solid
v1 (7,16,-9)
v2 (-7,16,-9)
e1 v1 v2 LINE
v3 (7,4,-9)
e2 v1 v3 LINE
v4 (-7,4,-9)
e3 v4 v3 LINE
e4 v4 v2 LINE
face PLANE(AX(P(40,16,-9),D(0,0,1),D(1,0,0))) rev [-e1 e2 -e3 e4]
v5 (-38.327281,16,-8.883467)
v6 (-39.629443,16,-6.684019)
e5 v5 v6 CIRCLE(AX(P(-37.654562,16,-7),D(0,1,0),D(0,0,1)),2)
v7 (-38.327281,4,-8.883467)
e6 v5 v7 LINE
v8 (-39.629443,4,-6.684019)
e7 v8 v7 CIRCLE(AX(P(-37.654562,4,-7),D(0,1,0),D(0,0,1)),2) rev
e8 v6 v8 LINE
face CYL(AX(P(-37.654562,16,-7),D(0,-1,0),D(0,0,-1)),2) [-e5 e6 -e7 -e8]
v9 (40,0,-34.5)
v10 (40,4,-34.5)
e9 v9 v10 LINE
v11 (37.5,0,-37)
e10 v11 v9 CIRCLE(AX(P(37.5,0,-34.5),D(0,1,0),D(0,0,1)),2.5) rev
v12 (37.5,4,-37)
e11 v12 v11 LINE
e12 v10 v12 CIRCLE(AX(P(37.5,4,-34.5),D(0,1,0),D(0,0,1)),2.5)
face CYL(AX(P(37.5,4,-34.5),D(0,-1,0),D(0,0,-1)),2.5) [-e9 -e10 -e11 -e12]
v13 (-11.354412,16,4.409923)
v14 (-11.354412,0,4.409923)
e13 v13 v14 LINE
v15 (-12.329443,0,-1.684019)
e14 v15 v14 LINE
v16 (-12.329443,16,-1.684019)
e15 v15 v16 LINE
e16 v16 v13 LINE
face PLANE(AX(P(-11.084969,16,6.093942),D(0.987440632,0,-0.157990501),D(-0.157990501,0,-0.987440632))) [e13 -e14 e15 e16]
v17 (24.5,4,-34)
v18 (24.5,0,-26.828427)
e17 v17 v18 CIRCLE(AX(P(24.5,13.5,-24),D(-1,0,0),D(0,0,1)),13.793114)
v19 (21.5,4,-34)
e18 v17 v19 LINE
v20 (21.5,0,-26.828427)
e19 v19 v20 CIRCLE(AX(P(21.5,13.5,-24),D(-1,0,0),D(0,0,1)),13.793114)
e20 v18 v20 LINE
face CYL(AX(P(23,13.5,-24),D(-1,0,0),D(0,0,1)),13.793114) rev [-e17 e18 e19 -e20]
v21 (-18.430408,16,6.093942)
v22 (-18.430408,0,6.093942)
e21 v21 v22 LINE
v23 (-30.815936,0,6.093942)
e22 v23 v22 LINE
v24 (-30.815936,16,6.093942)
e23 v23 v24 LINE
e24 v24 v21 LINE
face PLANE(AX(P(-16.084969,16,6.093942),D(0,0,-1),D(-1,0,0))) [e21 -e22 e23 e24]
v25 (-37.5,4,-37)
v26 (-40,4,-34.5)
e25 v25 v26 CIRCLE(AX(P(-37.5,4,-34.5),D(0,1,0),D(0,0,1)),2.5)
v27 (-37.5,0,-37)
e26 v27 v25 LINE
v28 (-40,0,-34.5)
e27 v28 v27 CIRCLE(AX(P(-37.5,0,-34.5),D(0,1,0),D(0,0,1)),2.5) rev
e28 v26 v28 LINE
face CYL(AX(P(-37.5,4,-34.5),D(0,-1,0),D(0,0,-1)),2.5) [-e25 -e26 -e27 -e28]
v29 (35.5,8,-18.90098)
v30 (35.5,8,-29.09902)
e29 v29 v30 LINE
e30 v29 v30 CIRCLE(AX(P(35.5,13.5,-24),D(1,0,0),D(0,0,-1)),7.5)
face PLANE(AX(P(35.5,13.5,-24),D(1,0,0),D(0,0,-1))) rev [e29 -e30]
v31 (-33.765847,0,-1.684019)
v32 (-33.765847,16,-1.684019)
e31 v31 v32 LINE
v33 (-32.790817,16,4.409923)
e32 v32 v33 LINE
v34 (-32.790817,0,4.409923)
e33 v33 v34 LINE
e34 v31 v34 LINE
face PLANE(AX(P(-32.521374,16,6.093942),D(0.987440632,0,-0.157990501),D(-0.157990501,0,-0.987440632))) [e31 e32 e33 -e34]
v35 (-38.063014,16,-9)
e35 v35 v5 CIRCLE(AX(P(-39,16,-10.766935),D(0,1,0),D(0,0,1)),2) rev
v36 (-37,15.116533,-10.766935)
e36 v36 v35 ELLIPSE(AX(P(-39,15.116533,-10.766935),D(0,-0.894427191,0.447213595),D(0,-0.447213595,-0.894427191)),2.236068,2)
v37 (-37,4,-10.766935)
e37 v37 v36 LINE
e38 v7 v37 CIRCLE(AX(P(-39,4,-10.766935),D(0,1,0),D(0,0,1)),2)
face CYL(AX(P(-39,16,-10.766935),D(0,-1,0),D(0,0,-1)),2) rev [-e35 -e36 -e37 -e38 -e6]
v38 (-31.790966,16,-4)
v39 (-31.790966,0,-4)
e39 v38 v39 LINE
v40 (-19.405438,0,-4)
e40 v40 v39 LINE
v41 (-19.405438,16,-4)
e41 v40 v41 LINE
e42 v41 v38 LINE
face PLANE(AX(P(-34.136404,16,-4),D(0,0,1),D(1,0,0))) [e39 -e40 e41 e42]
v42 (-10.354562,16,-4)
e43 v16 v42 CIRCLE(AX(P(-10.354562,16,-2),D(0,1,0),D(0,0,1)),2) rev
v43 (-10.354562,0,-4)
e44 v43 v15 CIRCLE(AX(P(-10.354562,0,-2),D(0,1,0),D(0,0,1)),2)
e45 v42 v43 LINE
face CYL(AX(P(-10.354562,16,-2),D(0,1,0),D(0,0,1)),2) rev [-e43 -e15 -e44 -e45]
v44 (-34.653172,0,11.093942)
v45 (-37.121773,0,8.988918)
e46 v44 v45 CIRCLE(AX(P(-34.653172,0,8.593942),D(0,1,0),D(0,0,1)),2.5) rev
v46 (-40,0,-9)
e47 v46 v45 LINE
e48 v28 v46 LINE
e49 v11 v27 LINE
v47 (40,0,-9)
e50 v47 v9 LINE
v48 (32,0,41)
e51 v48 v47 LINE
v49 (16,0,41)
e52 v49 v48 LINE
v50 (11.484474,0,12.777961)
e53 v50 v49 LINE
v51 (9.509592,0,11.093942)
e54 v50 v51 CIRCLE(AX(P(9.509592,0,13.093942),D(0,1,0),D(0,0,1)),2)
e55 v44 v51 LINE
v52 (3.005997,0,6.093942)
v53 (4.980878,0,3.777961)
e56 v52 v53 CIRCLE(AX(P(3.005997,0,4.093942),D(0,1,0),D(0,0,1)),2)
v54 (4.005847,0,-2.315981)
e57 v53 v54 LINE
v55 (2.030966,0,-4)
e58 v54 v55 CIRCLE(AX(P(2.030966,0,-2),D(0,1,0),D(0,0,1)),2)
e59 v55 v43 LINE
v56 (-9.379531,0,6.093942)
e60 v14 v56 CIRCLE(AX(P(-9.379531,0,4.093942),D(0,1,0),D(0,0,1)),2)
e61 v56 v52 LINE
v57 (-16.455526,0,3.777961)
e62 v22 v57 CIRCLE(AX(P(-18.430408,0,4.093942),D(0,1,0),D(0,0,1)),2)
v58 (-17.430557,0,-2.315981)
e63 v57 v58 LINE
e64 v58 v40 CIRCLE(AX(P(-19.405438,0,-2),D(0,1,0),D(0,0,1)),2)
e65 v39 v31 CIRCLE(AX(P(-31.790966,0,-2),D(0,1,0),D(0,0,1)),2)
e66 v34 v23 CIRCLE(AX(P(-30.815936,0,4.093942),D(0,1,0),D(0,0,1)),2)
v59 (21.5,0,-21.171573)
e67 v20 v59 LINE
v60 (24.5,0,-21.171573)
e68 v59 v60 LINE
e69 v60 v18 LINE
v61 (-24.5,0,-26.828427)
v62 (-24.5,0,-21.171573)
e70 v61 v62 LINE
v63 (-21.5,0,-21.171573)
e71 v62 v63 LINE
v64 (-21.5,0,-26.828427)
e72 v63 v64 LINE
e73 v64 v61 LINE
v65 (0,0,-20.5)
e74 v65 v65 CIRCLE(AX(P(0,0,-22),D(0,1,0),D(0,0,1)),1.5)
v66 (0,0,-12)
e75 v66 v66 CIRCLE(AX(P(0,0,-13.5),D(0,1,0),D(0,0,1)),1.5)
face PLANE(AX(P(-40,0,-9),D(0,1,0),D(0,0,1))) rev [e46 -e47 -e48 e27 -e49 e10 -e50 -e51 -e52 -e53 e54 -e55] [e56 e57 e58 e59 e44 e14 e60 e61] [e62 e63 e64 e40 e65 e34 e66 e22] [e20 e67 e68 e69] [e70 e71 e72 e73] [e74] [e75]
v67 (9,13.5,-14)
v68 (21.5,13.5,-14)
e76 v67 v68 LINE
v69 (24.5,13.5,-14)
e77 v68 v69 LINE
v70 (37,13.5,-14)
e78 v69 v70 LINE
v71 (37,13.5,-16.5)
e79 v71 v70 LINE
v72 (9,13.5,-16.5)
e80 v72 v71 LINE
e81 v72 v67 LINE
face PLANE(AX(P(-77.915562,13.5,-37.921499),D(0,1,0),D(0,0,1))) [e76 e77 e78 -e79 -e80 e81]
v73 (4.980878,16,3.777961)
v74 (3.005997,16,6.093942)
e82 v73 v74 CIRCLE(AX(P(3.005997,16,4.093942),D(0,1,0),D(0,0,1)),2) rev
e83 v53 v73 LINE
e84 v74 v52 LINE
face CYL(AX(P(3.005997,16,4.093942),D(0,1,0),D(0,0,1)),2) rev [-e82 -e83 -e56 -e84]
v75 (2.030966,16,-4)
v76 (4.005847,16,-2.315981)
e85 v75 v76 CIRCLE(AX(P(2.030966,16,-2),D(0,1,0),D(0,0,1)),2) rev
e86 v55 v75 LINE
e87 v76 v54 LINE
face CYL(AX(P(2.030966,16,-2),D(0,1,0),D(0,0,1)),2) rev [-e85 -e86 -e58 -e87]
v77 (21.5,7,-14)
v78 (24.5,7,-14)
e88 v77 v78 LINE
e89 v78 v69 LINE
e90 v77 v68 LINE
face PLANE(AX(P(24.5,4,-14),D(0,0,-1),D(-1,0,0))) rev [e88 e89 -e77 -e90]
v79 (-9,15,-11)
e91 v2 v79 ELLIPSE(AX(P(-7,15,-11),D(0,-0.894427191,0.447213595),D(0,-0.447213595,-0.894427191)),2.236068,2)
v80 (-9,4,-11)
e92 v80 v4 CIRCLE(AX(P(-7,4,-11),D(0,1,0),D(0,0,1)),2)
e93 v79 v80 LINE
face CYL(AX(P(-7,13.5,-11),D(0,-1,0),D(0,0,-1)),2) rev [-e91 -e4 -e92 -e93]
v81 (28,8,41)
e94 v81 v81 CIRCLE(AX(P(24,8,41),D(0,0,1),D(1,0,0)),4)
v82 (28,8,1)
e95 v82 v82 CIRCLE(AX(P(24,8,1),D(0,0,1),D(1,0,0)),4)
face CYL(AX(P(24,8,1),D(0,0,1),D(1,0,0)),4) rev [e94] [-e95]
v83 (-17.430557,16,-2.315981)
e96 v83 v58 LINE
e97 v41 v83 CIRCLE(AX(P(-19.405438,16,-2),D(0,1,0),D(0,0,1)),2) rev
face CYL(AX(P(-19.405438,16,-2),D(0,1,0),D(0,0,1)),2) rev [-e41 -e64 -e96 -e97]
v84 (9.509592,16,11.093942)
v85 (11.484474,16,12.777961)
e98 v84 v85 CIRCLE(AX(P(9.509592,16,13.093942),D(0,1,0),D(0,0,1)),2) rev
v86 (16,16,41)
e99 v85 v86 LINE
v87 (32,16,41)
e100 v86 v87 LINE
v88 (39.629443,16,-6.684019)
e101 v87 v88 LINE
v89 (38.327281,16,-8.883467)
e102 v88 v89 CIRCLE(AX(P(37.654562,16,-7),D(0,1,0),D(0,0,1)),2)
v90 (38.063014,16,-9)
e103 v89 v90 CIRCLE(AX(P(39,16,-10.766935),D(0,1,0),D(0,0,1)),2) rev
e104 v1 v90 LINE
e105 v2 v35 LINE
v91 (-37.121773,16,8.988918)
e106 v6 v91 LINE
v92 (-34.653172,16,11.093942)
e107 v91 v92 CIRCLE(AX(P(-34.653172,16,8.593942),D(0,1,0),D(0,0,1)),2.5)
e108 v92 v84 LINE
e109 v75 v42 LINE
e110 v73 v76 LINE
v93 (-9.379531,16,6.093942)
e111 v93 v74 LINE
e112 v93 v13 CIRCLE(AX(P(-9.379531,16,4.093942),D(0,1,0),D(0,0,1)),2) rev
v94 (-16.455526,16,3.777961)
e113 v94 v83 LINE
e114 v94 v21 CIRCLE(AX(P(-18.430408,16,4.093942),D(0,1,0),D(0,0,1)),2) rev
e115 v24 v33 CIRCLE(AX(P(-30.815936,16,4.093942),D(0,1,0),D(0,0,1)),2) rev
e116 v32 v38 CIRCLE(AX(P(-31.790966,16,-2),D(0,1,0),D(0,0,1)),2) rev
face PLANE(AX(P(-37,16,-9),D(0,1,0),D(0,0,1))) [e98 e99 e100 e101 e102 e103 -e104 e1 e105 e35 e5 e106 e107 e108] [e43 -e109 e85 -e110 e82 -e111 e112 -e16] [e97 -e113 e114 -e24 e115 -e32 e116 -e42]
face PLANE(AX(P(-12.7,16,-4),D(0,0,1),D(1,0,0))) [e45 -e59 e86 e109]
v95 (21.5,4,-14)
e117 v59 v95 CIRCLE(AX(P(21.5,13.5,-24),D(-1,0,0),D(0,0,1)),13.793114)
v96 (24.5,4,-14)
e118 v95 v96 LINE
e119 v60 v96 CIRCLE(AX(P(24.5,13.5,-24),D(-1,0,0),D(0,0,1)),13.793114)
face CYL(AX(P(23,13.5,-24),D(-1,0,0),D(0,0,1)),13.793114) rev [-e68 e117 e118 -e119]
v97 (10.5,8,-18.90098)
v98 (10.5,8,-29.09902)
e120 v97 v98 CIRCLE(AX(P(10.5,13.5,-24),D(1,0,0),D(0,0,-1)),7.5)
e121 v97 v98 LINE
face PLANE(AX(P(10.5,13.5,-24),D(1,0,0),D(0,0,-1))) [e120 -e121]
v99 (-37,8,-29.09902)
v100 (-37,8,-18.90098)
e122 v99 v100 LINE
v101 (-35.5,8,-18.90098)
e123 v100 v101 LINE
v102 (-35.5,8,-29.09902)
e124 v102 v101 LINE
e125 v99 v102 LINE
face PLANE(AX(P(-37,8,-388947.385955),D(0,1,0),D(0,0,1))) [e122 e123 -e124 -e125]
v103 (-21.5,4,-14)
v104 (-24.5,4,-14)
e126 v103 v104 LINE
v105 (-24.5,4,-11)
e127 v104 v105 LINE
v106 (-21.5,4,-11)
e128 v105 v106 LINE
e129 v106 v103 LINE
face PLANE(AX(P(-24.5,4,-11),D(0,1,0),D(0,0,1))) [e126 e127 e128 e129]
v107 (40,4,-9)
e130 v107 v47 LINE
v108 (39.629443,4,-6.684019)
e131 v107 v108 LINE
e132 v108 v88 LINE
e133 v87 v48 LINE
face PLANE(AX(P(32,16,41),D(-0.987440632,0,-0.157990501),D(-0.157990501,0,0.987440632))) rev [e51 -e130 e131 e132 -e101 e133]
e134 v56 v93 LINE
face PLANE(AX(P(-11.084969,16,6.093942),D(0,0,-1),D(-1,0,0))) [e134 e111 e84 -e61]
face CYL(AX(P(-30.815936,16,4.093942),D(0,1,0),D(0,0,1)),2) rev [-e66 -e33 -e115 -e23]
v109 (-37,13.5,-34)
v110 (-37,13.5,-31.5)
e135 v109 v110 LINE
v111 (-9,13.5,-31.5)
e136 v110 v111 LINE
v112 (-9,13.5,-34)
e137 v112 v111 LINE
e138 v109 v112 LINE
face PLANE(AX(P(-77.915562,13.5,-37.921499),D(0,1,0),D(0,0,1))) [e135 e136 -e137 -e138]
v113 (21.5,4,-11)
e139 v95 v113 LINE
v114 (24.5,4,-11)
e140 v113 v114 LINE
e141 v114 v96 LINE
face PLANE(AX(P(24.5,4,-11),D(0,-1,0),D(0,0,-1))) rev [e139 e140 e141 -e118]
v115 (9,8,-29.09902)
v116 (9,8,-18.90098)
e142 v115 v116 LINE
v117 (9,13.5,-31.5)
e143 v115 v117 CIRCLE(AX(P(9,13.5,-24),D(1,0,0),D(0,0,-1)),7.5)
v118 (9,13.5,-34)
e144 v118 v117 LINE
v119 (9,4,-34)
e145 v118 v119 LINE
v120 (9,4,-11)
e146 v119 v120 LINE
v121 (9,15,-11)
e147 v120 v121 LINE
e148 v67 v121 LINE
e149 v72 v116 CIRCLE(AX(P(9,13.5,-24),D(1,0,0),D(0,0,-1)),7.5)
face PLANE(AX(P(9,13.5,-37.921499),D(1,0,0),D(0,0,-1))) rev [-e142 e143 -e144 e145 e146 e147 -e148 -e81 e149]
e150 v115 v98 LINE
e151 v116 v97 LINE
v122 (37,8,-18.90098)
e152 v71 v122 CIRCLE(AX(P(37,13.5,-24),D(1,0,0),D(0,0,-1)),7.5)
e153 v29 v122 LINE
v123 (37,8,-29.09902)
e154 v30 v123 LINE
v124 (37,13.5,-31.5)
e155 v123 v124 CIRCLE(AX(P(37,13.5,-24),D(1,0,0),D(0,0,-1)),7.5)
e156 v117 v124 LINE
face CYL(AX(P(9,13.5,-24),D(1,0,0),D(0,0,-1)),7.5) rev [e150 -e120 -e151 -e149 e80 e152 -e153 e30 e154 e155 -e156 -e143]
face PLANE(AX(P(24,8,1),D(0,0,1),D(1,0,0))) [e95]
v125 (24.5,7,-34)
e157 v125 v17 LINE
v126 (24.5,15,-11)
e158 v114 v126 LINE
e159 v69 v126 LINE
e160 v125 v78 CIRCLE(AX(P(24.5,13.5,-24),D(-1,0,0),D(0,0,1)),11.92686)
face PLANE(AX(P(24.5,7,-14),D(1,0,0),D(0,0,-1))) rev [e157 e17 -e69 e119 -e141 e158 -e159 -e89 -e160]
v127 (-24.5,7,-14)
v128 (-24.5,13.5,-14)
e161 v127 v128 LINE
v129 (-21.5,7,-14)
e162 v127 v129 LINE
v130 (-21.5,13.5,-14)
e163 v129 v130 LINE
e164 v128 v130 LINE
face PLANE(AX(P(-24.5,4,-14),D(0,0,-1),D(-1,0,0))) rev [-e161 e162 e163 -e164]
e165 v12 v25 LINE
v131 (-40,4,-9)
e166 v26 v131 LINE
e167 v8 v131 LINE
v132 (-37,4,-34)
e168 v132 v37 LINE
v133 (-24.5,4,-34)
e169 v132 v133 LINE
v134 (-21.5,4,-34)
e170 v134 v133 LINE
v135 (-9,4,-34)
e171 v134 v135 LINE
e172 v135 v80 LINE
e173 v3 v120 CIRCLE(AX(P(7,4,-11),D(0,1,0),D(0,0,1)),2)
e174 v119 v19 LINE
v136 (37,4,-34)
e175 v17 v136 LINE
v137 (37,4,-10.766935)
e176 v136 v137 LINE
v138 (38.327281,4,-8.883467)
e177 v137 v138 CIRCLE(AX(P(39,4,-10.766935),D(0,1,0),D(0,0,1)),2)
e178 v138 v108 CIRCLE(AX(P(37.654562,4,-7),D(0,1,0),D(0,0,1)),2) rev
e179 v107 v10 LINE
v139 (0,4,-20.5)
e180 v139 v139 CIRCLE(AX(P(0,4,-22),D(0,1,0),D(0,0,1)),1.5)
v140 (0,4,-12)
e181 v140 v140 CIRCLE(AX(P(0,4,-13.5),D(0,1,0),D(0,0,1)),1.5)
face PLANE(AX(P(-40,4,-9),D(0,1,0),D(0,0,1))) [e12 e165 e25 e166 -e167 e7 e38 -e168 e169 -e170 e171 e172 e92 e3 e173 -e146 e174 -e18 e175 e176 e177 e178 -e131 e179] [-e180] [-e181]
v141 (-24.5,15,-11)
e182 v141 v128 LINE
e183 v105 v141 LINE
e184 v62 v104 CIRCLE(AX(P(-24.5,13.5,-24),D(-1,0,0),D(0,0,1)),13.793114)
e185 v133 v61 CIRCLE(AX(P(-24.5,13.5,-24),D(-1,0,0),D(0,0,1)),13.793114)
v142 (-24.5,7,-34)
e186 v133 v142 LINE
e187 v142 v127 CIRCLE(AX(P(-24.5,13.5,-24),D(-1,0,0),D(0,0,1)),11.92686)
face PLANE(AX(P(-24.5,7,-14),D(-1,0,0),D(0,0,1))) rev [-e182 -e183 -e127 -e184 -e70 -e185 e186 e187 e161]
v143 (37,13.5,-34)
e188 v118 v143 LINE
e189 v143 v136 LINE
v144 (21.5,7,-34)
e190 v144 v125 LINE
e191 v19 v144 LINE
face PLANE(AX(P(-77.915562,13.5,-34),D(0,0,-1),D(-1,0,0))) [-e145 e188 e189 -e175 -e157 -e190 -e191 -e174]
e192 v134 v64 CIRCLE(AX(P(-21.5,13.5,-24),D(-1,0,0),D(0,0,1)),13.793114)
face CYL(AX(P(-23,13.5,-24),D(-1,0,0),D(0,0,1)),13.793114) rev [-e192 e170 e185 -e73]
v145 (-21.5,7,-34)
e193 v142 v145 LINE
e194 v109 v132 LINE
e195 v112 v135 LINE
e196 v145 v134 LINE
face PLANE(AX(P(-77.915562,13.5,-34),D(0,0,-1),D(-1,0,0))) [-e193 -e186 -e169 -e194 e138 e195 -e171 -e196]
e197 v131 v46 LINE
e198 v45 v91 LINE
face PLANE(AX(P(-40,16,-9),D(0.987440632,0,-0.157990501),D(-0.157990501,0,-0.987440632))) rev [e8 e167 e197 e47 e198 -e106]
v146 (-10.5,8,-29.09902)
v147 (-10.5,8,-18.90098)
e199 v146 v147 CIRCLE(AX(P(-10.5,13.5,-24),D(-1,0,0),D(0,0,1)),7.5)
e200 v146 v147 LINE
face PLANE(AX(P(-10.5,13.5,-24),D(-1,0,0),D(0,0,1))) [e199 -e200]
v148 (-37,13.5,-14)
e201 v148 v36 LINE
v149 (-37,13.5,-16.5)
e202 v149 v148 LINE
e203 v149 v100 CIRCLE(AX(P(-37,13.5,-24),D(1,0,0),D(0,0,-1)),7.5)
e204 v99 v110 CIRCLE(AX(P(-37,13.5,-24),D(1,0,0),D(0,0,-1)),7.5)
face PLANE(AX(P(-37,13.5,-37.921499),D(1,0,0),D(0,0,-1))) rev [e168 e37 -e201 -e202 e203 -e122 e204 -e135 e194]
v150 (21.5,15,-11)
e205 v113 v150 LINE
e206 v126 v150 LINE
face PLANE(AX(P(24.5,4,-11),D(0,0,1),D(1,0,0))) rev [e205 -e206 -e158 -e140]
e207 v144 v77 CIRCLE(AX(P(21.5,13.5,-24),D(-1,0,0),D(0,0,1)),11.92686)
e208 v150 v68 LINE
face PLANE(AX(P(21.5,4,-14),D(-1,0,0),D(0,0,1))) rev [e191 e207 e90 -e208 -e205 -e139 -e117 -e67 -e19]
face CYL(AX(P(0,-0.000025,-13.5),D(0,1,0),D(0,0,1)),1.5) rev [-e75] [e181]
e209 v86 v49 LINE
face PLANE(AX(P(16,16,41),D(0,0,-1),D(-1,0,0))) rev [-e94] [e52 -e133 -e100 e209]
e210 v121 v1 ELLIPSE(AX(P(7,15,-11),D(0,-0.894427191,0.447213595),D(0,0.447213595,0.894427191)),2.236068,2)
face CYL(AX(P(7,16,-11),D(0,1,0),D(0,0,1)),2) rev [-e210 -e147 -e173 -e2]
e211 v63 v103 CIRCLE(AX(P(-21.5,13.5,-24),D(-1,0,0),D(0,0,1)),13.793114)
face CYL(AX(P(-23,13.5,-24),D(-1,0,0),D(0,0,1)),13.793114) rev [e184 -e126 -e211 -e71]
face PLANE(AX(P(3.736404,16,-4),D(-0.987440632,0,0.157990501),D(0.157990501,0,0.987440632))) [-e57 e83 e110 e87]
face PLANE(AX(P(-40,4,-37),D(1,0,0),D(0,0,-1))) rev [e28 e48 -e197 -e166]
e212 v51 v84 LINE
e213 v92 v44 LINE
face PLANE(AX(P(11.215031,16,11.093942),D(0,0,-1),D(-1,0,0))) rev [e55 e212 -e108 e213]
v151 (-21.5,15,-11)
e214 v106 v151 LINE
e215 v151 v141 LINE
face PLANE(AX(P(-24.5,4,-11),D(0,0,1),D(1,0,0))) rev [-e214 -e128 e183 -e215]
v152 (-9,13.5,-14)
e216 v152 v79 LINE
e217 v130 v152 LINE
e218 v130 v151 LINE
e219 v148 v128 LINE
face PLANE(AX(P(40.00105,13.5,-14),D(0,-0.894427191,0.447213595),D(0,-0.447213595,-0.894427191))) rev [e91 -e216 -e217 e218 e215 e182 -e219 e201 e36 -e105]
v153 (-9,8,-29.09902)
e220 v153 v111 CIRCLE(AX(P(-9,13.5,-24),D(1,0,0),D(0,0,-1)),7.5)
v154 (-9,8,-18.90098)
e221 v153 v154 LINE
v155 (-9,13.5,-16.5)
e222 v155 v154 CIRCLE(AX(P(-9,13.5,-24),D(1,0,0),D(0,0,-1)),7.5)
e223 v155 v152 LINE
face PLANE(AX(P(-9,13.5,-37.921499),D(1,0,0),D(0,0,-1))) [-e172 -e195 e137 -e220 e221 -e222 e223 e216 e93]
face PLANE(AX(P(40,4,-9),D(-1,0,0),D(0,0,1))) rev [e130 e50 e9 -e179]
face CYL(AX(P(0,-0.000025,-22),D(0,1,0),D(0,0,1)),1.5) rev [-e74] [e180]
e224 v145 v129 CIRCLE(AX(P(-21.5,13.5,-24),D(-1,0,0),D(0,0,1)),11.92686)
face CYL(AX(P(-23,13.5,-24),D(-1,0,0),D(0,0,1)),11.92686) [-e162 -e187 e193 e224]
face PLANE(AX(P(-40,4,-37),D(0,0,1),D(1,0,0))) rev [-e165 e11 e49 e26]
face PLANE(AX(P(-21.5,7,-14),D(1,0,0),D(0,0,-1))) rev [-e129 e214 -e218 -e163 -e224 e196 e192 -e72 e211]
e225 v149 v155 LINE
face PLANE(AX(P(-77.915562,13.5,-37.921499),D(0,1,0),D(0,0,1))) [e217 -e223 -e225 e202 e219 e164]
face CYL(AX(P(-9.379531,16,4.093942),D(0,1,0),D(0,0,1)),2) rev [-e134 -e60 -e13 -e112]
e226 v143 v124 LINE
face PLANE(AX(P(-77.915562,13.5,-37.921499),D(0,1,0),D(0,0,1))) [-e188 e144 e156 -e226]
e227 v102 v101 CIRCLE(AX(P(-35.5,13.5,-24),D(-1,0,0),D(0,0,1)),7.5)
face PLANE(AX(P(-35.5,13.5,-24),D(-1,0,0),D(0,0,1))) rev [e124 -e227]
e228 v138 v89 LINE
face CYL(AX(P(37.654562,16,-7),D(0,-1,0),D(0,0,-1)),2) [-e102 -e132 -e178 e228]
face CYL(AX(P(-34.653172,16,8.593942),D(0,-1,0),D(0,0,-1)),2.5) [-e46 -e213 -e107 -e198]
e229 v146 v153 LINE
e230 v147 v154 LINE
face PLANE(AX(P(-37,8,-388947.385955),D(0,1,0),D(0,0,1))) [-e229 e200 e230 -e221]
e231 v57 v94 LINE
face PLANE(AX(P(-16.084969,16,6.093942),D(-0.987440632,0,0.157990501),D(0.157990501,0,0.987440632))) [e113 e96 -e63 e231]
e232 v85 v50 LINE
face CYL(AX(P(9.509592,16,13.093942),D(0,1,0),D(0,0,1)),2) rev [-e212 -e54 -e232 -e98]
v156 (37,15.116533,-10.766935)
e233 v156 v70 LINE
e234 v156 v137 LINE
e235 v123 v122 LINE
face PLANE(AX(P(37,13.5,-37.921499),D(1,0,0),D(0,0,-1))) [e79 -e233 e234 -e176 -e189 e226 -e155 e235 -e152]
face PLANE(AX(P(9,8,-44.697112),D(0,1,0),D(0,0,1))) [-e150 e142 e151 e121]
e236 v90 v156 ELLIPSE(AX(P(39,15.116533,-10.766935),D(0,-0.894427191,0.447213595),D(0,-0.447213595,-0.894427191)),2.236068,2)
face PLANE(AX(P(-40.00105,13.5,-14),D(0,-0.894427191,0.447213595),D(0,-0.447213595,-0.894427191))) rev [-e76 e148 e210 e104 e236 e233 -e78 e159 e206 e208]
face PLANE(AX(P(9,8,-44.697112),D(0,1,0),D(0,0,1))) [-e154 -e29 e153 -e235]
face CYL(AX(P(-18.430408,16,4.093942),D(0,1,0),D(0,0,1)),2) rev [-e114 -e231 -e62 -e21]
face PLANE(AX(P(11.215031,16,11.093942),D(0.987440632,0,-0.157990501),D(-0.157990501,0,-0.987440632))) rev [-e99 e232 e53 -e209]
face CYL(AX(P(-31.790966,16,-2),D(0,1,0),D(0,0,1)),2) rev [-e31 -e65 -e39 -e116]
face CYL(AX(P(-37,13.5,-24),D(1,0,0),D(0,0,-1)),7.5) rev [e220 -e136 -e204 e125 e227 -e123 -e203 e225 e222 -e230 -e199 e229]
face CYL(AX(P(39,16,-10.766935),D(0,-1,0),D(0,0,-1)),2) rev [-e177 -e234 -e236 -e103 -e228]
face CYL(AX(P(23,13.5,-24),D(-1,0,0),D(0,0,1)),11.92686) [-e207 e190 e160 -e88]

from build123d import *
from build123d.topology import SkipClean

# Parameters (mm, degrees)
SKETCH7_W           = 80
SKETCH7_H           = 28
EXTRUDE2_DEPTH      = 4
SKETCH8_W           = 28
SKETCH8_H           = 20
EXTRUDE3_DEPTH      = 9.5
EXTRUDE6_DEPTH      = 28
SKETCH15_R          = 7.5
EXTRUDE7_DEPTH      = 25
SKETCH16_W          = 3
SKETCH16_H          = 3
SKETCH8_4_W         = 28
SKETCH8_4_H         = 20
EXTRUDE8_DEPTH      = 9.5
EXTRUDE9_DEPTH      = 28
SKETCH19_R          = 7.5
EXTRUDE10_DEPTH     = 25
SKETCH20_W          = 3
SKETCH20_H          = 3
FILLET1_R           = 2.5
EXTRUDE11_DEPTH     = 16
SKETCH23_R          = 4
EXTRUDE12_DEPTH     = 40
SKETCH25_W          = 28
SKETCH25_H          = 5
EXTRUDE13_DEPTH     = 12
EXTRUDE14_REACH     = 90.69
FILLET2_R           = 2.5
FILLET9_R           = 2
FILLET10_R          = 2
FILLET11_R          = 2
SKETCH27_W          = 28
SKETCH27_H          = 5
EXTRUDE15_DEPTH     = 12
EXTRUDE16_REACH     = 90.69
FILLET12_R          = 2
FILLET13_R          = 2
FILLET14_R          = 2
FILLET15_R          = 2
SKETCH30_W          = 3
SKETCH30_H          = 3
EXTRUDE17_DEPTH     = 12
SKETCH31_W          = 3
SKETCH31_H          = 3
EXTRUDE18_DEPTH     = 12
FILLET16_R          = 2
EXTRUDE19_OUTLINE_R = 1.5
EXTRUDE19_DEPTH     = 4


# Read off the part's stored shape, not the designer's step: Extrude19
with BuildPart() as part:
    # Sketch7 → Extrude2 (new body)
    with BuildSketch(Plane(origin=(0, 0, 0), x_dir=(1, 0, 0), z_dir=(0, 1, 0))):
        with Locations((0, 23)):
            Rectangle(SKETCH7_W, SKETCH7_H)
    extrude(amount=EXTRUDE2_DEPTH)


with BuildPart() as body_2:
    # Sketch8 → Extrude3 (new body)
    with BuildSketch(Plane(origin=(0, 4, 0), x_dir=(1, 0, 0), z_dir=(0, 1, 0))):
        with Locations((-23, 24)):
            Rectangle(SKETCH8_W, SKETCH8_H)
    extrude(amount=EXTRUDE3_DEPTH)

    # Sketch10 → Extrude6 (cut)
    with BuildSketch(Plane(origin=(-9, 0, 0), x_dir=(0, 0, -1), z_dir=(1, 0, 0))):
        with BuildLine():
            Line((31.5, 13.5), (24, 13.5))
            Line((24, 13.5), (16.5, 13.5))
            ThreePointArc((16.5, 13.5), (17.126403912, 10.499387259), (18.900980486, 8))
            Line((18.900980486, 8), (29.099019514, 8))
            ThreePointArc((29.099019514, 8), (30.873596088, 10.499387259), (31.5, 13.5))
        make_face()
    extrude(amount=-EXTRUDE6_DEPTH, mode=Mode.SUBTRACT)

    # Sketch15 → Extrude7 (cut)
    with SkipClean():  # the faces are left unmerged after this step: merging them gives an invalid solid
        with BuildSketch(Plane.ZY.offset(35.5)):
            with Locations((-24, 13.5)):
                Circle(SKETCH15_R)
        extrude(amount=-EXTRUDE7_DEPTH, mode=Mode.SUBTRACT)


with BuildPart() as cut_sweep1_tool:
    # Cut-Sweep1: sweep along a path in Sketch17
    with SkipClean():  # the faces are left unmerged after this step: merging them gives an invalid solid
        with BuildLine(Plane(origin=(-23, 0, 0), x_dir=(0, 0, -1), z_dir=(1, 0, 0))) as cut_sweep1_path:
            CenterArc((24, 13.5), 12.806248475, 0, 360)
        # Sketch16 → Cut-Sweep1 (sweep)
        with BuildSketch(Plane.XY.offset(-14)):
            with Locations((-23, 5.5)):
                Rectangle(SKETCH16_W, SKETCH16_H)
        sweep(path=cut_sweep1_path.line)


with BuildPart() as part_1:
    with SkipClean():  # the faces are left unmerged after this step: merging them gives an invalid solid
        add(part.part)

        # Cut-Sweep1: cut by cut_sweep1_tool
        add(cut_sweep1_tool.part, mode=Mode.SUBTRACT)

    # Sketch8<4> → Extrude8 (add)
    with BuildSketch(Plane(origin=(0, 4, 0), x_dir=(1, 0, 0), z_dir=(0, 1, 0))):
        with Locations((23, 24)):
            Rectangle(SKETCH8_4_W, SKETCH8_4_H)
    extrude(amount=EXTRUDE8_DEPTH)

    # Sketch18 → Extrude9 (cut)
    with BuildSketch(Plane(origin=(37, 0, 0), x_dir=(0, 0, -1), z_dir=(1, 0, 0))):
        with BuildLine():
            Line((18.900980486, 8), (29.099019514, 8))
            ThreePointArc((29.099019514, 8), (30.873596088, 10.499387259), (31.5, 13.5))
            Line((31.5, 13.5), (16.5, 13.5))
            ThreePointArc((16.5, 13.5), (17.126403912, 10.499387259), (18.900980486, 8))
        make_face()
    extrude(amount=-EXTRUDE9_DEPTH, mode=Mode.SUBTRACT)

    # Sketch19 → Extrude10 (cut)
    with BuildSketch(Plane(origin=(35.5, 0, 0), x_dir=(0, 0, -1), z_dir=(1, 0, 0))):
        with Locations((24, 13.5)):
            Circle(SKETCH19_R)
    extrude(amount=-EXTRUDE10_DEPTH, mode=Mode.SUBTRACT)

    # Cut-Sweep2: sweep along a path in Sketch21
    with BuildLine(Plane(origin=(23, 0, 0), x_dir=(0, 0, -1), z_dir=(1, 0, 0))) as cut_sweep2_path:
        CenterArc((24, 13.5), 12.806248475, 0, 360)
    # Sketch20 → Cut-Sweep2 (sweep, cut)
    with BuildSketch(Plane.XY.offset(-14)):
        with Locations((23, 5.5)):
            Rectangle(SKETCH20_W, SKETCH20_H)
    sweep(path=cut_sweep2_path.line, mode=Mode.SUBTRACT)

    # Fillet1
    fillet1_edges = [part_1.edges().sort_by_distance(p)[0] for p in [
        (-40, 2, -37),
        (40, 2, -37),
    ]]
    fillet(fillet1_edges, radius=FILLET1_R)

    # Sketch22 → Extrude11 (add)
    with BuildSketch(Plane(origin=(0, 0, 0), x_dir=(1, 0, 0), z_dir=(0, 1, 0))):
        Polygon((11.215030697, -11.093941854), (16, -41), (32, -41), (40, 9), (-40, 9), (-36.784969303, -11.093941854), align=None)
        Polygon((3.73640444, 4), (5.351435136, -6.093941854), (-11.084969303, -6.093941854), (-12.7, 4), align=None, mode=Mode.SUBTRACT)
        Polygon((-16.084969303, -6.093941854), (-32.521373743, -6.093941854), (-34.13640444, 4), (-17.7, 4), align=None, mode=Mode.SUBTRACT)
    extrude(amount=EXTRUDE11_DEPTH)

    # Sketch23 → Extrude12 (cut)
    with BuildSketch(Plane.XY.offset(41)):
        with Locations((24, 8)):
            Circle(SKETCH23_R)
    extrude(amount=-EXTRUDE12_DEPTH, mode=Mode.SUBTRACT)



with BuildPart() as body_2_1:
    with SkipClean():  # the faces are left unmerged after this step: merging them gives an invalid solid
        add(body_2.part)

        # Cut-Sweep1: cut by cut_sweep1_tool
        add(cut_sweep1_tool.part, mode=Mode.SUBTRACT)


with BuildPart() as part_2:
    with SkipClean():  # the faces are left unmerged after this step: merging them gives an invalid solid
        add(part_1.part)

        add(body_2_1.part)  # Extrude13 merges body 2
        # Sketch25 → Extrude13 (add)
        with BuildSketch(Plane(origin=(0, 4, 0), x_dir=(-1, 0, 0), z_dir=(0, 1, 0))):
            with Locations((23, -11.5)):
                Rectangle(SKETCH25_W, SKETCH25_H)
        extrude(amount=EXTRUDE13_DEPTH)

    # Sketch26 → Extrude14 (cut, up to next)
    with BuildSketch(Plane.ZY.offset(37), mode=Mode.PRIVATE) as extrude14_sk1:
        Polygon((-14, 13.5), (-9, 16), (-14, 16), align=None)
    extrude14_tool1 = extrude(extrude14_sk1.sketch, amount=-EXTRUDE14_REACH, mode=Mode.PRIVATE) & part_2.part
    add(extrude14_tool1.solids().sort_by_distance((-37, 15.166667, -12.333333))[0], mode=Mode.SUBTRACT)

    # Fillet2
    fillet2_edges = [part_2.edges().sort_by_distance(p)[0] for p in [
        (-36.784969303, 8, 11.093941854),
    ]]
    fillet(fillet2_edges, radius=FILLET2_R)

    # Fillet9
    fillet9_edges = [part_2.edges().sort_by_distance(p)[0] for p in [
        (-40, 10, -9),
    ]]
    fillet(fillet9_edges, radius=FILLET9_R)

    # Fillet10
    # the kernel refuses this fillet: 2 mm, written as the material it adds along each edge
    with BuildSketch(Plane(origin=(-37, 4, -9), x_dir=(0, 0, -1), z_dir=(0, 1, 0))) as fillet10_piece_1_section:
        with BuildLine():
            CenterArc((1.766934561, 2), FILLET10_R, 199.655233066, 70.344766934)
            Line((-0.11653272, 1.327280888), (-0.304879448, 1.260008977))
            ThreePointArc((-0.304879448, 1.260008977), (-0.2, 0.654561776), (-0.2, 0))
            Line((-0.2, 0), (0, -0.2))
            Line((0, -0.2), (1.766934561, -0.2))
            Line((1.766934561, -0.2), (1.766934561, 0))
        make_face()
    fillet10_piece_1 = extrude(amount=12, mode=Mode.PRIVATE)
    fillet10_piece_1 = split(fillet10_piece_1, bisect_by=Plane(origin=(-37.361885023, 14.554978546, -11.890042908), z_dir=(0, -0.8944271909999159, 0.44721359549995804)), keep=Keep.TOP, mode=Mode.PRIVATE)
    add(fillet10_piece_1)

    # Fillet11
    # the kernel refuses this fillet: 2 mm, written as the material it adds along each edge
    with BuildSketch(Plane(origin=(-9, 4, -9), x_dir=(1, 0, 0), z_dir=(0, 1, 0))) as fillet11_piece_1_section:
        with BuildLine():
            CenterArc((FILLET11_R, FILLET11_R), FILLET11_R, 180, 90)
            Line((0, FILLET11_R), (0, 0))
            Line((0, 0), (FILLET11_R, 0))
        make_face()
    fillet11_piece_1 = extrude(amount=17, mode=Mode.PRIVATE)
    fillet11_piece_1 = split(fillet11_piece_1, bisect_by=Plane(origin=(-8.54975152, 14.60165577, -11.796688461), z_dir=(0, -0.894427190999916, 0.447213595499958)), keep=Keep.TOP, mode=Mode.PRIVATE)
    add(fillet11_piece_1)

    # Sketch27 → Extrude15 (add)
    with BuildSketch(Plane(origin=(0, 4, 0), x_dir=(-1, 0, 0), z_dir=(0, 1, 0))):
        with Locations((-23, -11.5)):
            Rectangle(SKETCH27_W, SKETCH27_H)
    extrude(amount=EXTRUDE15_DEPTH)

    # Sketch28 → Extrude16 (cut, up to next)
    with BuildSketch(Plane(origin=(37, 0, 0), x_dir=(0, 0, -1), z_dir=(1, 0, 0)), mode=Mode.PRIVATE) as extrude16_sk1:
        Polygon((14, 13.5), (9, 16), (14, 16), align=None)
    extrude16_tool1 = extrude(extrude16_sk1.sketch, amount=-EXTRUDE16_REACH, mode=Mode.PRIVATE) & part_2.part
    add(extrude16_tool1.solids().sort_by_distance((37, 15.166667, -12.333333))[0], mode=Mode.SUBTRACT)

    # Fillet12
    fillet12_edges = [part_2.edges().sort_by_distance(p)[0] for p in [
        (40, 10, -9),
    ]]
    fillet(fillet12_edges, radius=FILLET12_R)

    # Fillet13
    # the kernel refuses this fillet: 2 mm, written as the material it adds along each edge
    with BuildSketch(Plane(origin=(37, -0.417336402, -9), x_dir=(0.9961678888786428, 0, 0.08746163254289291), z_dir=(0, 1, 0))) as fillet13_piece_1_section:
        with BuildLine():
            CenterArc((1.837796796, 1.935086736), FILLET13_R, 185.017593378, 70.344766934)
            Line((-0.154538981, 1.760163471), (-0.353772559, 1.742671145))
            Line((-0.353772559, 1.742671145), (-0.199233578, -0.017492327))
            Line((-0.199233578, -0.017492327), (0.017492327, -0.199233578))
            ThreePointArc((0.017492327, -0.199233578), (0.669545749, -0.141984536), (1.281845737, -0.193508674))
            Line((1.281845737, -0.193508674), (1.332386742, 0))
        make_face()
    fillet13_piece_1 = extrude(amount=16.417336402, mode=Mode.PRIVATE)
    fillet13_piece_1 = split(fillet13_piece_1, bisect_by=Plane(origin=(37.361885023, 14.554978546, -11.890042908), z_dir=(0, -0.8944271909999157, 0.4472135954999582)), keep=Keep.TOP, mode=Mode.PRIVATE)
    fillet13_piece_1 = split(fillet13_piece_1, bisect_by=Plane(origin=(37.361885023, 0, -9.612553635), z_dir=(0, 1, 0)), keep=Keep.TOP, mode=Mode.PRIVATE)
    add(fillet13_piece_1)

    # Fillet14
    # the kernel refuses this fillet: 2 mm, written as the material it adds along each edge
    with BuildSketch(Plane(origin=(9, 4, -9), x_dir=(0, 0, -1), z_dir=(0, 1, 0))) as fillet14_piece_1_section:
        with BuildLine():
            CenterArc((FILLET14_R, FILLET14_R), FILLET14_R, 180, 90)
            Line((0, FILLET14_R), (0, 0))
            Line((0, 0), (FILLET14_R, 0))
        make_face()
    fillet14_piece_1 = extrude(amount=17, mode=Mode.PRIVATE)
    fillet14_piece_1 = split(fillet14_piece_1, bisect_by=Plane(origin=(8.54975152, 14.60165577, -11.796688461), z_dir=(0, -0.894427190999916, 0.447213595499958)), keep=Keep.TOP, mode=Mode.PRIVATE)
    add(fillet14_piece_1)

    # Fillet15
    fillet15_edges = [part_2.edges().sort_by_distance(p)[0] for p in [
        (-12.7, 8, -4),
        (-11.084969303, 8, 6.093941854),
        (5.351435136, 8, 6.093941854),
        (3.73640444, 8, -4),
        (-17.7, 8, -4),
        (-34.13640444, 8, -4),
        (-32.521373743, 8, 6.093941854),
        (-16.084969303, 8, 6.093941854),
    ]]
    fillet(fillet15_edges, radius=FILLET15_R)

    # Sketch30 → Extrude17 (cut)
    with BuildSketch(Plane(origin=(0, 16, 0), x_dir=(-1, 0, 0), z_dir=(0, 1, 0))):
        with Locations((-23, -12.5)):
            Rectangle(SKETCH30_W, SKETCH30_H)
    extrude(amount=-EXTRUDE17_DEPTH, mode=Mode.SUBTRACT)

    # Sketch31 → Extrude18 (cut)
    with BuildSketch(Plane(origin=(0, 16, 0), x_dir=(-1, 0, 0), z_dir=(0, 1, 0))):
        with Locations((23, -12.5)):
            Rectangle(SKETCH31_W, SKETCH31_H)
    extrude(amount=-EXTRUDE18_DEPTH, mode=Mode.SUBTRACT)

    # Fillet16
    fillet16_edges = [part_2.edges().sort_by_distance(p)[0] for p in [
        (11.215030697, 8, 11.093941854),
    ]]
    fillet(fillet16_edges, radius=FILLET16_R)

    # Extrude19 outline → Extrude19 (cut)
    with BuildSketch(Plane(origin=(0, 0, 0), x_dir=(1, 0, 0), z_dir=(0, 1, 0))):
        with Locations((0, 22)):
            Circle(EXTRUDE19_OUTLINE_R)
        with Locations((0, 13.5)):
            Circle(EXTRUDE19_OUTLINE_R)
    extrude(amount=EXTRUDE19_DEPTH, mode=Mode.SUBTRACT)


solid = part_2.part
